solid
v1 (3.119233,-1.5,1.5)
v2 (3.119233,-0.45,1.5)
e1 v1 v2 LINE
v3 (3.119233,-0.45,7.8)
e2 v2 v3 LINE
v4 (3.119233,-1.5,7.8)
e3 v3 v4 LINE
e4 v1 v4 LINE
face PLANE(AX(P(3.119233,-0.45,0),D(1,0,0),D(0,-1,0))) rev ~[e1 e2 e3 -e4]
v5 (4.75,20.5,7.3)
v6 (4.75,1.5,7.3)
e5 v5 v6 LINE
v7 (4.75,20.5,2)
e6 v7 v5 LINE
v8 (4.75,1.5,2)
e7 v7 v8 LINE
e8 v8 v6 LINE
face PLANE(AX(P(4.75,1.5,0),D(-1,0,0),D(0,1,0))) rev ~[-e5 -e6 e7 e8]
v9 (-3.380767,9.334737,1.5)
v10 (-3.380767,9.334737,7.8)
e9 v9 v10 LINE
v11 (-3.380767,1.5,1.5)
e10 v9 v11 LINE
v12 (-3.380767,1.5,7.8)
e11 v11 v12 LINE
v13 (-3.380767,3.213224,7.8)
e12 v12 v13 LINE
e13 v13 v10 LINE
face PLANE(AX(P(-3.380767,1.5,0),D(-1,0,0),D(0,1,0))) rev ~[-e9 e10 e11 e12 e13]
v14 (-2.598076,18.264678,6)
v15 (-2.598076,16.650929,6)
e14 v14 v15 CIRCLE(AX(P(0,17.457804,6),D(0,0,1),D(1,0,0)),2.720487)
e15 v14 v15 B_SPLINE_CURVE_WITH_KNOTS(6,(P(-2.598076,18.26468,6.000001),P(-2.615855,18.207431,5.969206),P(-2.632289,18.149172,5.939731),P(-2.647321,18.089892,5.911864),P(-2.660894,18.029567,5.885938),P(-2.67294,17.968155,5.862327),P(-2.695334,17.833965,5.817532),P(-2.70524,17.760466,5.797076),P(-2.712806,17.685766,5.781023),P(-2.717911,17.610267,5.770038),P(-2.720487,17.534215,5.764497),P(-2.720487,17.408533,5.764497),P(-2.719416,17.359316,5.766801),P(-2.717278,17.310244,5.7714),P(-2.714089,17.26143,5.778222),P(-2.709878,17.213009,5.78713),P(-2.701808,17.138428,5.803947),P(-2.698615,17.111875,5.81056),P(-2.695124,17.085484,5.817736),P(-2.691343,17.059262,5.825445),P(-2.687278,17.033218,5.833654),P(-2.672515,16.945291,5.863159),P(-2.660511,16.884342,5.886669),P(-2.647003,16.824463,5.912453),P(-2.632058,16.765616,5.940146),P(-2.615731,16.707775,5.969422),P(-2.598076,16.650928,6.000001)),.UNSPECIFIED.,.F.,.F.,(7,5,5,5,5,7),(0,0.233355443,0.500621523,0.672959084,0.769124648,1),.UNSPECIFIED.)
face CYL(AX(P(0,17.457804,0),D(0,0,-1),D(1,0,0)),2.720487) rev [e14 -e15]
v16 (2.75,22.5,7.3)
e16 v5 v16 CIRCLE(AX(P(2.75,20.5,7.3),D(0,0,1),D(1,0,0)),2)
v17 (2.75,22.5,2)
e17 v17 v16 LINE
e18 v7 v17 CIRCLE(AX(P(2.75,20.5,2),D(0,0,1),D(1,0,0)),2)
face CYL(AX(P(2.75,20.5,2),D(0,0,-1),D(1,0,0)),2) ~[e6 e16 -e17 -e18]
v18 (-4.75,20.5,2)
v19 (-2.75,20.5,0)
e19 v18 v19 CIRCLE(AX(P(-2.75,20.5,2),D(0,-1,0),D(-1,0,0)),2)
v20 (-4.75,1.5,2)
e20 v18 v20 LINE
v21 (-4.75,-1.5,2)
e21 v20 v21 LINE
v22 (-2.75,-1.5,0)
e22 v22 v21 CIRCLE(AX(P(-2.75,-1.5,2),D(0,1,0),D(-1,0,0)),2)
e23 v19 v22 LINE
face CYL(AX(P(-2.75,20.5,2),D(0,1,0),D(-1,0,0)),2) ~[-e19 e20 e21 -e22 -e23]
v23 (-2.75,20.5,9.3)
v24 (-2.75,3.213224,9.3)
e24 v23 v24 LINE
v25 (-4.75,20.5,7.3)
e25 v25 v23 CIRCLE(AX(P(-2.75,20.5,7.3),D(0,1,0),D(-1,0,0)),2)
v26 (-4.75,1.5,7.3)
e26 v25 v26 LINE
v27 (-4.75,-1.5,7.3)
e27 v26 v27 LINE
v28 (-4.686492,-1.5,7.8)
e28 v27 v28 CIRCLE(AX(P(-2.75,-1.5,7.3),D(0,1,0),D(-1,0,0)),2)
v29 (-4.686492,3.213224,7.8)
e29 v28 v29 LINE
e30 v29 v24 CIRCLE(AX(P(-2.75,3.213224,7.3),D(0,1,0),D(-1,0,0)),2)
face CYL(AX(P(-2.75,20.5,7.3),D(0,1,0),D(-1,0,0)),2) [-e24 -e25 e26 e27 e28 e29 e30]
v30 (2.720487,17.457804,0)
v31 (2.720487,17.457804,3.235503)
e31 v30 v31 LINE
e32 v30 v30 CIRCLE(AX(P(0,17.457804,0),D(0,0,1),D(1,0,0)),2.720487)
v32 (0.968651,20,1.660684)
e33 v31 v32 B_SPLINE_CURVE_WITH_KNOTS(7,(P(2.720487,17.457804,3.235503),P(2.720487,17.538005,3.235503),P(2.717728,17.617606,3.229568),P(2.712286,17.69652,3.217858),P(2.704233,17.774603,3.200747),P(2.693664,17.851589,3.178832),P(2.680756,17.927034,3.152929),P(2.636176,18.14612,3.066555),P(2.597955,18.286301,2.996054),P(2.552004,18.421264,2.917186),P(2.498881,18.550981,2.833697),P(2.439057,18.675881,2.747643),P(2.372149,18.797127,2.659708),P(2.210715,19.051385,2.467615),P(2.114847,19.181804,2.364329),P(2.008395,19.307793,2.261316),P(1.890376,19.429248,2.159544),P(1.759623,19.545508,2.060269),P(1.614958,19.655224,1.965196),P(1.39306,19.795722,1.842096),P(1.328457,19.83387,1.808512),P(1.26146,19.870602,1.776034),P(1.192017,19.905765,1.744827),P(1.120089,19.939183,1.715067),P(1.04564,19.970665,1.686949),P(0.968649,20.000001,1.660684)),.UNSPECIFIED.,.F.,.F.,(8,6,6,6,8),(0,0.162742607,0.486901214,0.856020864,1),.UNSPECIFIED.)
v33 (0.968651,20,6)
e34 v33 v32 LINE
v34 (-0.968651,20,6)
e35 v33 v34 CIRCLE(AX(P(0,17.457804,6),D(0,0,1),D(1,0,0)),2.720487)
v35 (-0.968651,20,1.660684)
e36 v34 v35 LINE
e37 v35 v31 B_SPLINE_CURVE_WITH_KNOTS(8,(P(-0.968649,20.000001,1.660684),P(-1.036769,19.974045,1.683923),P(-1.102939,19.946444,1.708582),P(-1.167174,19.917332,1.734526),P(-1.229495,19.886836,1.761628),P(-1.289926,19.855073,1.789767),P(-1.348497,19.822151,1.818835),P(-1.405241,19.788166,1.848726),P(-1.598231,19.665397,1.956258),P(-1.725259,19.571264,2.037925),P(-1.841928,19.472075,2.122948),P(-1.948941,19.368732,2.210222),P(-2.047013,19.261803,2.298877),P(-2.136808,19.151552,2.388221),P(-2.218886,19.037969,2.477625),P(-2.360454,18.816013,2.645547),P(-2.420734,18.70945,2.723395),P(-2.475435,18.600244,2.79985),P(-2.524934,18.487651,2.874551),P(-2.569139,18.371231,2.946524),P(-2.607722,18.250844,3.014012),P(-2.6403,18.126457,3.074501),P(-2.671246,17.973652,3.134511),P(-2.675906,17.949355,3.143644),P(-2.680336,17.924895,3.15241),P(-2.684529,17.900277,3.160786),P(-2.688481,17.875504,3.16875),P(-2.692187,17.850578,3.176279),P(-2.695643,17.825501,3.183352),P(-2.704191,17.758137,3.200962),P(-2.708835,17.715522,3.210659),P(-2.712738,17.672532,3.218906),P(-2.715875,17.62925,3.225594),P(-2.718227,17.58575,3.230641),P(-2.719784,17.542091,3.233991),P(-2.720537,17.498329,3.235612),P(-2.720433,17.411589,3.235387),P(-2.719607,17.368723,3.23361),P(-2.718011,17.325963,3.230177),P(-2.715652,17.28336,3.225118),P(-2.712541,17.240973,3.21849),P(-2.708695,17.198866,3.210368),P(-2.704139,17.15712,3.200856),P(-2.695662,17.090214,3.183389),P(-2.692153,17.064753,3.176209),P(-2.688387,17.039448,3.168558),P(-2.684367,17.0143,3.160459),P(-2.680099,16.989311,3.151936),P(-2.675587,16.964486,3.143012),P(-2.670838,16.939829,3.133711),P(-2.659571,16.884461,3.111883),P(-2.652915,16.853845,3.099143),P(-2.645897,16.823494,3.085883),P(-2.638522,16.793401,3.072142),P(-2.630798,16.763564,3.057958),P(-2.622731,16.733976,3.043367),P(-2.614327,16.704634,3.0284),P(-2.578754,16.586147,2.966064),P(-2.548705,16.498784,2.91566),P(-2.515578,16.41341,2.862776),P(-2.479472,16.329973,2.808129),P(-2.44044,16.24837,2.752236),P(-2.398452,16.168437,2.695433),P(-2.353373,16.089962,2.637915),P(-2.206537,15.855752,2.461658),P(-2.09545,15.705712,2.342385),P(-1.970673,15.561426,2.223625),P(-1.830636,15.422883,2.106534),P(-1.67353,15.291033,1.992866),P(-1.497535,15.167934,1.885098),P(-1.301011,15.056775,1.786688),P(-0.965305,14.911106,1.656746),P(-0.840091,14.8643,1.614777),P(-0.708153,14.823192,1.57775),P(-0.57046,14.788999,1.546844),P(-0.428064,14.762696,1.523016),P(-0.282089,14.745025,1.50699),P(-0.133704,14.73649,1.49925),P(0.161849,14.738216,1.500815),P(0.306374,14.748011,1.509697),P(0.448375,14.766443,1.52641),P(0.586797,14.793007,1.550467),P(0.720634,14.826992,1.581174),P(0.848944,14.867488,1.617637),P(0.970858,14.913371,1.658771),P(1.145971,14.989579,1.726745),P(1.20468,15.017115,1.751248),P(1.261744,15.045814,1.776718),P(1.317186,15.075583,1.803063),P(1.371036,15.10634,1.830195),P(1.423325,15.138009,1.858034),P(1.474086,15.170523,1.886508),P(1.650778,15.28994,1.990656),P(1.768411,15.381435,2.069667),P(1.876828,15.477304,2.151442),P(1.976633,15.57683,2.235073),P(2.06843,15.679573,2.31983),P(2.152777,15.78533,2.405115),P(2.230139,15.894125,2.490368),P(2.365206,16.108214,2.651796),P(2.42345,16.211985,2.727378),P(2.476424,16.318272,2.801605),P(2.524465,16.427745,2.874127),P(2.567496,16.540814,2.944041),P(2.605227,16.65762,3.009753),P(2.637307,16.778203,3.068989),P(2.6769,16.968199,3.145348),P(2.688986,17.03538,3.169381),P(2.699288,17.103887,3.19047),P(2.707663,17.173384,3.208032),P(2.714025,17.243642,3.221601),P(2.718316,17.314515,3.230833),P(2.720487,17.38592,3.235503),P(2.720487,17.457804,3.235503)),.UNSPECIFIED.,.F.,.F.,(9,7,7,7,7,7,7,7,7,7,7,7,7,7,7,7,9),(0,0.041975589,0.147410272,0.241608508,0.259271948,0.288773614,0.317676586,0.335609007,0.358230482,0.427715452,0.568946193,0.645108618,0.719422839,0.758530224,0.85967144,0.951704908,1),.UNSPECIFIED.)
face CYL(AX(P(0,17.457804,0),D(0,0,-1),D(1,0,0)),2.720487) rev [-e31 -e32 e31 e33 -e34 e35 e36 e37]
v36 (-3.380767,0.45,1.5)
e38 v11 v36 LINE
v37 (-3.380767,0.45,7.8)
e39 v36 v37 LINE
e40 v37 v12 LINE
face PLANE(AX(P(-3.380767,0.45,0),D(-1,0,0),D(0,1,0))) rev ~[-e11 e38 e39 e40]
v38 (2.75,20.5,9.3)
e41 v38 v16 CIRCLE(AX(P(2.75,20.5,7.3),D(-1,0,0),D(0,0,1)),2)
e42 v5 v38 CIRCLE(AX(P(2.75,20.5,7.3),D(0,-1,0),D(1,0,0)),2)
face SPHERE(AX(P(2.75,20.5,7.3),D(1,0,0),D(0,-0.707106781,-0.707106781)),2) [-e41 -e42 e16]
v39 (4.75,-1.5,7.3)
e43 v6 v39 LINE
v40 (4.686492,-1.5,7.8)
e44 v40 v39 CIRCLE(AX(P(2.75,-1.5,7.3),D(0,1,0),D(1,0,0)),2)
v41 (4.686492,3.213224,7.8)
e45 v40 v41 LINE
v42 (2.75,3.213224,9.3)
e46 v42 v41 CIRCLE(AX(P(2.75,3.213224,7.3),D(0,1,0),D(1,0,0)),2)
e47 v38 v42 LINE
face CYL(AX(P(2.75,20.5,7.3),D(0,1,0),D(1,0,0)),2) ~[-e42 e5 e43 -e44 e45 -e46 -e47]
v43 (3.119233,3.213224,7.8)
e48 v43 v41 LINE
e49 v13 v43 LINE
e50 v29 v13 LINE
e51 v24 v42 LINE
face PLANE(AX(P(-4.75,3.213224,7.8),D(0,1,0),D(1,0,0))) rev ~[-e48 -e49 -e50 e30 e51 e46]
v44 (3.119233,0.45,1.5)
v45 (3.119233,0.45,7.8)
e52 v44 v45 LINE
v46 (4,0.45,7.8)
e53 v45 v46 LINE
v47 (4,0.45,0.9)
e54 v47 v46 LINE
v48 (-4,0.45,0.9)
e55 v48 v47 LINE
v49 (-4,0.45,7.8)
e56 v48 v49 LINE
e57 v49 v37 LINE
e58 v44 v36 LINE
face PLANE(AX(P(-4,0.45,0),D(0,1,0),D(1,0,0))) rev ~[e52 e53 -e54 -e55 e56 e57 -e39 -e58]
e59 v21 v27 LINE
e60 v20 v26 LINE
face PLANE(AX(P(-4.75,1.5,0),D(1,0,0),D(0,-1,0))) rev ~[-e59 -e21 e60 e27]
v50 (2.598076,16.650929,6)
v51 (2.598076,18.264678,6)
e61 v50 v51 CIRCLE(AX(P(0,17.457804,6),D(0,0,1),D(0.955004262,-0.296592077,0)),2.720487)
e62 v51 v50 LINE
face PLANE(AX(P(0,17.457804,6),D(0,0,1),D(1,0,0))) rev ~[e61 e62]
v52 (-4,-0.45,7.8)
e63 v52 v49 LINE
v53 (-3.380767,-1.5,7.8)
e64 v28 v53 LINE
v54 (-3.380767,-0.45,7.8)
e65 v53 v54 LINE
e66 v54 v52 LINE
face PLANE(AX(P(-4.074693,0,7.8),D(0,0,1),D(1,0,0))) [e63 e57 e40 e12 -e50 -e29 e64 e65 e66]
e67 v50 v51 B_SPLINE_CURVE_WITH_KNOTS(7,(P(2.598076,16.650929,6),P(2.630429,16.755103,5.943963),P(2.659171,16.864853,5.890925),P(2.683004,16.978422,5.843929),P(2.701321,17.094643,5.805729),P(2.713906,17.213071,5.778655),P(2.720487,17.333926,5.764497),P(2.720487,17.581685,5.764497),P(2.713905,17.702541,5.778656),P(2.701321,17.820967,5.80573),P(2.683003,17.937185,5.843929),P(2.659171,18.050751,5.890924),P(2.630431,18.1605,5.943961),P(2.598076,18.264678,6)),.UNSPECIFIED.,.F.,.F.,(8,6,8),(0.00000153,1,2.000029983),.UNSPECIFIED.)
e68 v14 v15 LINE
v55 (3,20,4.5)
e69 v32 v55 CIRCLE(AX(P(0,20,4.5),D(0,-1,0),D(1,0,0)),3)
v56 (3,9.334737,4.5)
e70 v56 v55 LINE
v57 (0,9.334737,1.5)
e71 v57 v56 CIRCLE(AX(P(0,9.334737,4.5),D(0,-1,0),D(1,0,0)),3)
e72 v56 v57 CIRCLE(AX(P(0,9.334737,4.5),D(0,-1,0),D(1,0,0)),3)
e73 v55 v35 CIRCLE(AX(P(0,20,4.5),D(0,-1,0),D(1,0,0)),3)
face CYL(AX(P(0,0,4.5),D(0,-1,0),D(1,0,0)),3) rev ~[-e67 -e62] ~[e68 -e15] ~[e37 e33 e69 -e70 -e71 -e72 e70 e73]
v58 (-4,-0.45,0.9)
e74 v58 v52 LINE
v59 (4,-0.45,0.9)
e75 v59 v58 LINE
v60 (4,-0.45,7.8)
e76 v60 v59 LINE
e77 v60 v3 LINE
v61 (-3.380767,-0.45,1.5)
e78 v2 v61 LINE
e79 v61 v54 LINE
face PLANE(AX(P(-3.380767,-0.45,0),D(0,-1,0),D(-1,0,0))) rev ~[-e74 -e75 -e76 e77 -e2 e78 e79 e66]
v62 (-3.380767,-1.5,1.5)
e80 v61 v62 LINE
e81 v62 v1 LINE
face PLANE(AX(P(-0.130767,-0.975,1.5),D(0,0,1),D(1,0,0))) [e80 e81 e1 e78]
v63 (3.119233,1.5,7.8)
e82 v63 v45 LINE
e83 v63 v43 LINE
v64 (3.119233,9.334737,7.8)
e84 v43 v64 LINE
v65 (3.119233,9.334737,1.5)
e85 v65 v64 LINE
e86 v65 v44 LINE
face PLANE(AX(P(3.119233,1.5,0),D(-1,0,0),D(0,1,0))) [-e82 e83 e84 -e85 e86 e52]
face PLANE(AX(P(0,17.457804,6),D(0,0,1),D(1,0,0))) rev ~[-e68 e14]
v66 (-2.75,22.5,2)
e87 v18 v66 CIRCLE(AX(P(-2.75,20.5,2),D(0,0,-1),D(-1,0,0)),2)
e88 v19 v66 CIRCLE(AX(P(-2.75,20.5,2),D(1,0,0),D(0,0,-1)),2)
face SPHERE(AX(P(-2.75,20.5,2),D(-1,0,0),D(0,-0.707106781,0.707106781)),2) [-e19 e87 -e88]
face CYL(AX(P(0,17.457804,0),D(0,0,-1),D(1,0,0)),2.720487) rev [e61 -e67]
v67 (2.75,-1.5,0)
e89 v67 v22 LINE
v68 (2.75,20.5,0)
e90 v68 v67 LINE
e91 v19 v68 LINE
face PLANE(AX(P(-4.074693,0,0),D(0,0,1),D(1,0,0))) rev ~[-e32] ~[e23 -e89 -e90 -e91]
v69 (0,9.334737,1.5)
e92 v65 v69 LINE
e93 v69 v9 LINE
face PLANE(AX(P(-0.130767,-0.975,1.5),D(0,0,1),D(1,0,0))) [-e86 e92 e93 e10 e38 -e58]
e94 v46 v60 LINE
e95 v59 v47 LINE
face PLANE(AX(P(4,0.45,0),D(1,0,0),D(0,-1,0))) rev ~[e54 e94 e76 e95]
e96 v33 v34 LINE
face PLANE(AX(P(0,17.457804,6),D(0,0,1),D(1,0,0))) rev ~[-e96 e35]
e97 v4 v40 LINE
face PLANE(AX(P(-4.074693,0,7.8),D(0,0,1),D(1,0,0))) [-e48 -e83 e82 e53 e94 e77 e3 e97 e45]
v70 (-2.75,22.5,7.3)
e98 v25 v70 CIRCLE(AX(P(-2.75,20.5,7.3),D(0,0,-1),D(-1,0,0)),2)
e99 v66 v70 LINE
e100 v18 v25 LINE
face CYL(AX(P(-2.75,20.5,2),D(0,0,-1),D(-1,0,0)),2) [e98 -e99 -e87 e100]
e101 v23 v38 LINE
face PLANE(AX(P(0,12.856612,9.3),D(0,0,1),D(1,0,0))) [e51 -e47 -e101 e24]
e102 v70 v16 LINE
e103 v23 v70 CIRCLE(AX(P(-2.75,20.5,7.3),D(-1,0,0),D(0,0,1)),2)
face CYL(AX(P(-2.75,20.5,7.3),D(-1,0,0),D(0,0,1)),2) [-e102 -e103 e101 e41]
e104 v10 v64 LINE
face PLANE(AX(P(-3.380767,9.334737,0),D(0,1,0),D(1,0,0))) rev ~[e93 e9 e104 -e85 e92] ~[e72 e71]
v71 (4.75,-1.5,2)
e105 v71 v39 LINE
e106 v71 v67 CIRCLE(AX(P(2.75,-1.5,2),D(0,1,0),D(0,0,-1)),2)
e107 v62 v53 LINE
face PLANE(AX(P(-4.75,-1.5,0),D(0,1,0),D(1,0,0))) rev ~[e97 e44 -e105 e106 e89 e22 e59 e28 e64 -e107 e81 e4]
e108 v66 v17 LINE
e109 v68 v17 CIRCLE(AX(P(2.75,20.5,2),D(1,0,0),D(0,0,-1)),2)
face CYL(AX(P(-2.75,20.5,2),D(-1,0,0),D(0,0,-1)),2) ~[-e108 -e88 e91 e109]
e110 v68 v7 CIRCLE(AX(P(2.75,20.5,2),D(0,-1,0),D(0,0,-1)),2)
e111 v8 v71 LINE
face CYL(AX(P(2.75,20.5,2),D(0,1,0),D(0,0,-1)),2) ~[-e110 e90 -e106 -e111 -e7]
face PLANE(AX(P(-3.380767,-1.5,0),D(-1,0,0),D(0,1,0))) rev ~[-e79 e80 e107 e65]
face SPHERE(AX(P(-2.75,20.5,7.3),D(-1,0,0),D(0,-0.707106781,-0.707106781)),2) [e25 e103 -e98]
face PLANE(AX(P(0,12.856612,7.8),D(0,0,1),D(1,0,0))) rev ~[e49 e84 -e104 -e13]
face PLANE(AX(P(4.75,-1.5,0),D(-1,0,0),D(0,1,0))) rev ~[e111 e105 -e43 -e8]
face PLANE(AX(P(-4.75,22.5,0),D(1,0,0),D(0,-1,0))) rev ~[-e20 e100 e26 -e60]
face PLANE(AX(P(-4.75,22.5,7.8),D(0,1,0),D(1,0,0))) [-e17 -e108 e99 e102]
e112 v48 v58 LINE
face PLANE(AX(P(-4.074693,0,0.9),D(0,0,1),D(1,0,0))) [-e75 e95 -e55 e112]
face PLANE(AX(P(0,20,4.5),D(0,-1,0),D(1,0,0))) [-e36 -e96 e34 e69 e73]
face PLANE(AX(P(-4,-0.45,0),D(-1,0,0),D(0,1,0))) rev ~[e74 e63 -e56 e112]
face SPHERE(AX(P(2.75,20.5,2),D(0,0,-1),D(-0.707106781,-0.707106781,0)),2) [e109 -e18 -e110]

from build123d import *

# Parameters (mm, degrees)
F0_W         = 1.3692331631
F0_H         = 7.834737435
F0_W_2       = 6.5
F0_H_2       = 0.9
F0_W_3       = 0.6192331631
F0_H_3       = 1.05
F0_H_4       = 13.165262565
F0_W_4       = 0.8807668369
F0_W_5       = 1.6307668369
F1_DEPTH     = 0.9
F2_DEPTH     = 1.5
F3_DEPTH     = 7.8
F5_W         = 9.5
F5_H         = 19.2867757659
F6_DEPTH     = 1.5
F7_R         = 3
F8_DEPTH     = 20
F9_T1_DEPTH  = 5.3
F9_T3_DEPTH  = 5.5
F9_T5_DEPTH  = 22.2867757659
F9_T7_DEPTH  = 27
F9_S11_W     = 2
F9_S11_H     = 2
F9_T12_DEPTH = 2
F9_S17_W     = 2
F9_S17_H     = 2
F9_T18_DEPTH = 2
F9_S23_W     = 2
F9_S23_H     = 2
F9_T24_DEPTH = 2
F9_S29_W     = 2
F9_S29_H     = 2
F9_T30_DEPTH = 2
F10_R        = 2.7204865104
F11_DEPTH    = 6


# Not quite as in the source:
# - a fillet or chamfer that OpenCascade refuses, or shapes differently, is made with other operations: its cross-section is extruded or revolved along the edge and cut away or added
# - a feature names something its author has since deleted; it is built from what else it names


with BuildPart() as f1:
    # F0 (on Top) → F1 (new body)
    with BuildSketch(Plane.XY):
        Polygon((-4.75, 1.5), (-4.75, -1.5), (-3.3807668369, -1.5), (-3.3807668369, -0.45), (-4, -0.45), (-4, 0.45), (-3.3807668369, 0.45), (-3.3807668369, 1.5), align=None)
        Polygon((-3.3807668369, -0.45), (-3.3807668369, -1.5), (-3.1192331631, -1.5), (3.1192331631, -1.5), (3.1192331631, -0.45), align=None)
        with Locations((-4.0653834185, 5.4173687175)):
            Rectangle(F0_W, F0_H)
        with Locations((-0.1307668369, 0)):
            Rectangle(F0_W_2, F0_H_2)
        with Locations((-3.6903834185, 0)):
            Rectangle(F0_W_3, F0_H_2)
        with Locations((-0.1307668369, 5.4173687175)):
            Rectangle(F0_W_2, F0_H)
        with Locations((-0.1307668369, 0.975)):
            Rectangle(F0_W_2, F0_H_3)
        with Locations((-4.0653834185, 15.9173687175)):
            Rectangle(F0_W, F0_H_4)
        Polygon((3.1192331631, -0.45), (3.1192331631, -1.5), (3.3807668369, -1.5), (4.75, -1.5), (4.75, 1.5), (3.1192331631, 1.5), (3.1192331631, 0.45), (4, 0.45), (4, -0.45), align=None)
        with Locations((3.5596165815, 0)):
            Rectangle(F0_W_4, F0_H_2)
        with Locations((3.9346165815, 5.4173687175)):
            Rectangle(F0_W_5, F0_H)
        with Locations((-0.1307668369, 15.9173687175)):
            Rectangle(F0_W_2, F0_H_4)
        with Locations((3.9346165815, 15.9173687175)):
            Rectangle(F0_W_5, F0_H_4)
    extrude(amount=F1_DEPTH)

    # F0 (on Top) → F2 (join)
    with BuildSketch(Plane.XY):
        Polygon((-3.3807668369, -0.45), (-3.3807668369, -1.5), (-3.1192331631, -1.5), (3.1192331631, -1.5), (3.1192331631, -0.45), align=None)
        Polygon((3.1192331631, -0.45), (3.1192331631, -1.5), (3.3807668369, -1.5), (4.75, -1.5), (4.75, 1.5), (3.1192331631, 1.5), (3.1192331631, 0.45), (4, 0.45), (4, -0.45), align=None)
        Polygon((-4.75, 1.5), (-4.75, -1.5), (-3.3807668369, -1.5), (-3.3807668369, -0.45), (-4, -0.45), (-4, 0.45), (-3.3807668369, 0.45), (-3.3807668369, 1.5), align=None)
        with Locations((-0.1307668369, 0.975)):
            Rectangle(F0_W_2, F0_H_3)
        with Locations((-4.0653834185, 5.4173687175)):
            Rectangle(F0_W, F0_H)
        with Locations((3.9346165815, 5.4173687175)):
            Rectangle(F0_W_5, F0_H)
        with Locations((-0.1307668369, 5.4173687175)):
            Rectangle(F0_W_2, F0_H)
        with Locations((-4.0653834185, 15.9173687175)):
            Rectangle(F0_W, F0_H_4)
        with Locations((-0.1307668369, 15.9173687175)):
            Rectangle(F0_W_2, F0_H_4)
        with Locations((3.9346165815, 15.9173687175)):
            Rectangle(F0_W_5, F0_H_4)
    extrude(amount=F2_DEPTH)

    # F0 (on Top) → F3 (join)
    with BuildSketch(Plane.XY):
        Polygon((-4.75, 1.5), (-4.75, -1.5), (-3.3807668369, -1.5), (-3.3807668369, -0.45), (-4, -0.45), (-4, 0.45), (-3.3807668369, 0.45), (-3.3807668369, 1.5), align=None)
        Polygon((3.1192331631, -0.45), (3.1192331631, -1.5), (3.3807668369, -1.5), (4.75, -1.5), (4.75, 1.5), (3.1192331631, 1.5), (3.1192331631, 0.45), (4, 0.45), (4, -0.45), align=None)
        with Locations((-4.0653834185, 5.4173687175)):
            Rectangle(F0_W, F0_H)
        with Locations((3.9346165815, 5.4173687175)):
            Rectangle(F0_W_5, F0_H)
        with Locations((-4.0653834185, 15.9173687175)):
            Rectangle(F0_W, F0_H_4)
        with Locations((-0.1307668369, 15.9173687175)):
            Rectangle(F0_W_2, F0_H_4)
        with Locations((3.9346165815, 15.9173687175)):
            Rectangle(F0_W_5, F0_H_4)
    extrude(amount=F3_DEPTH)

    # F5 (on offset) → F6 (join)
    with BuildSketch(Plane.XY.offset(7.8)):
        with Locations((0, 12.856612117)):
            Rectangle(F5_W, F5_H)
    extrude(amount=F6_DEPTH)

    # F7 (on Front) → F8 (cut)
    with BuildSketch(Plane.XZ):
        with Locations((0, 4.5)):
            Circle(F7_R)
    extrude(amount=-F8_DEPTH, mode=Mode.SUBTRACT)

    # F9: fillet of radius 2 on 8 edges, made by hand

    # F9_s2 → F9_t1 (cut)
    with BuildSketch(Plane.XY.offset(2)):
        with BuildLine():
            ThreePointArc((4.75, 20.5), (4.1642135624, 21.9142135624), (2.75, 22.5))
            Line((2.75, 22.5), (4.75, 22.5))
            Line((4.75, 22.5), (4.75, 20.5))
        make_face()
        with BuildLine():
            ThreePointArc((-4.75, 20.5), (-4.1642135624, 21.9142135624), (-2.75, 22.5))
            Line((-2.75, 22.5), (-4.75, 22.5))
            Line((-4.75, 22.5), (-4.75, 20.5))
        make_face()
    extrude(amount=F9_T1_DEPTH, mode=Mode.SUBTRACT)

    # F9_s4 → F9_t3 (cut)
    with BuildSketch(Plane.YZ.offset(-2.75)):
        with BuildLine():
            ThreePointArc((20.5, 9.3), (21.9142135624, 8.7142135624), (22.5, 7.3))
            Line((22.5, 7.3), (22.5, 9.3))
            Line((22.5, 9.3), (20.5, 9.3))
        make_face()
        with BuildLine():
            ThreePointArc((20.5, 0), (21.9142135624, 0.5857864376), (22.5, 2))
            Line((22.5, 2), (22.5, 0))
            Line((22.5, 0), (20.5, 0))
        make_face()
    extrude(amount=F9_T3_DEPTH, mode=Mode.SUBTRACT)

    # F9_s6 → F9_t5 (cut)
    with BuildSketch(Plane.XZ.offset(-20.5)):
        with BuildLine():
            ThreePointArc((4.75, 7.3), (4.1642135624, 8.7142135624), (2.75, 9.3))
            Line((2.75, 9.3), (4.75, 9.3))
            Line((4.75, 9.3), (4.75, 7.3))
        make_face()
        with BuildLine():
            ThreePointArc((-4.75, 7.3), (-4.1642135624, 8.7142135624), (-2.75, 9.3))
            Line((-2.75, 9.3), (-4.75, 9.3))
            Line((-4.75, 9.3), (-4.75, 7.3))
        make_face()
    extrude(amount=F9_T5_DEPTH, mode=Mode.SUBTRACT)

    # F9_s8 → F9_t7 (cut)
    with BuildSketch(Plane.XZ.offset(-20.5)):
        with BuildLine():
            ThreePointArc((2.75, 0), (4.1642135624, 0.5857864376), (4.75, 2))
            Line((4.75, 2), (4.75, 0))
            Line((4.75, 0), (2.75, 0))
        make_face()
        with BuildLine():
            ThreePointArc((-4.75, 2), (-4.1642135624, 0.5857864376), (-2.75, 0))
            Line((-2.75, 0), (-4.75, 0))
            Line((-4.75, 0), (-4.75, 2))
        make_face()
    extrude(amount=F9_T7_DEPTH, mode=Mode.SUBTRACT)


with BuildPart() as f9_tool10:
    # F9_s11 → F9_t12 (new body)
    with BuildSketch(Plane.YZ.offset(2.75)):
        with Locations((21.5, 8.3)):
            Rectangle(F9_S11_W, F9_S11_H)
    extrude(amount=F9_T12_DEPTH)

    # F9_s13 → F9_t14 (revolve, cut)
    with BuildSketch(Plane(origin=(2.75, 20.5, 7.3), x_dir=(0, -0.7071067812, -0.7071067812), z_dir=(0, -0.7071067812, 0.7071067812))):
        with BuildLine():
            ThreePointArc((0, -2), (2, 0), (0, 2))
            Line((0, 2), (0, -2))
        make_face()
    revolve(axis=Axis((2.75, 20.5, 7.3), (1, 0, 0)), mode=Mode.SUBTRACT)


with BuildPart() as f1_1:
    add(f1.part)

    # F9_t9: cut F9_tool10
    add(f9_tool10.part, mode=Mode.SUBTRACT)


with BuildPart() as f9_tool16:
    # F9_s17 → F9_t18 (new body)
    with BuildSketch(Plane.XY.offset(2)):
        with Locations((3.75, 21.5)):
            Rectangle(F9_S17_W, F9_S17_H)
    extrude(amount=-F9_T18_DEPTH)

    # F9_s19 → F9_t20 (revolve, cut)
    with BuildSketch(Plane(origin=(2.75, 20.5, 2), x_dir=(-0.7071067812, -0.7071067812, 0), z_dir=(0.7071067812, -0.7071067812, 0))):
        with BuildLine():
            ThreePointArc((0, -2), (2, 0), (0, 2))
            Line((0, 2), (0, -2))
        make_face()
    revolve(axis=Axis((2.75, 20.5, 2), (0, 0, -1)), mode=Mode.SUBTRACT)


with BuildPart() as f1_2:
    add(f1_1.part)

    # F9_t15: cut F9_tool16
    add(f9_tool16.part, mode=Mode.SUBTRACT)


with BuildPart() as f9_tool22:
    # F9_s23 → F9_t24 (new body)
    with BuildSketch(Plane.YZ.offset(-2.75)):
        with Locations((21.5, 8.3)):
            Rectangle(F9_S23_W, F9_S23_H)
    extrude(amount=-F9_T24_DEPTH)

    # F9_s25 → F9_t26 (revolve, cut)
    with BuildSketch(Plane(origin=(-2.75, 20.5, 7.3), x_dir=(0, -0.7071067812, -0.7071067812), z_dir=(0, 0.7071067812, -0.7071067812))):
        with BuildLine():
            ThreePointArc((0, -2), (2, 0), (0, 2))
            Line((0, 2), (0, -2))
        make_face()
    revolve(axis=Axis((-2.75, 20.5, 7.3), (-1, 0, 0)), mode=Mode.SUBTRACT)


with BuildPart() as f1_3:
    add(f1_2.part)

    # F9_t21: cut F9_tool22
    add(f9_tool22.part, mode=Mode.SUBTRACT)


with BuildPart() as f9_tool28:
    # F9_s29 → F9_t30 (new body)
    with BuildSketch(Plane.YZ.offset(-2.75)):
        with Locations((21.5, 1)):
            Rectangle(F9_S29_W, F9_S29_H)
    extrude(amount=-F9_T30_DEPTH)

    # F9_s31 → F9_t32 (revolve, cut)
    with BuildSketch(Plane(origin=(-2.75, 20.5, 2), x_dir=(0, -0.7071067812, 0.7071067812), z_dir=(0, -0.7071067812, -0.7071067812))):
        with BuildLine():
            ThreePointArc((0, -2), (2, 0), (0, 2))
            Line((0, 2), (0, -2))
        make_face()
    revolve(axis=Axis((-2.75, 20.5, 2), (-1, 0, 0)), mode=Mode.SUBTRACT)


with BuildPart() as f1_4:
    add(f1_3.part)

    # F9_t27: cut F9_tool28
    add(f9_tool28.part, mode=Mode.SUBTRACT)

    # F10 (on Top) → F11 (cut)
    with BuildSketch(Plane.XY):
        with Locations((0, 17.4578037113)):
            Circle(F10_R)
    extrude(amount=F11_DEPTH, mode=Mode.SUBTRACT)


solid = f1_4.part
